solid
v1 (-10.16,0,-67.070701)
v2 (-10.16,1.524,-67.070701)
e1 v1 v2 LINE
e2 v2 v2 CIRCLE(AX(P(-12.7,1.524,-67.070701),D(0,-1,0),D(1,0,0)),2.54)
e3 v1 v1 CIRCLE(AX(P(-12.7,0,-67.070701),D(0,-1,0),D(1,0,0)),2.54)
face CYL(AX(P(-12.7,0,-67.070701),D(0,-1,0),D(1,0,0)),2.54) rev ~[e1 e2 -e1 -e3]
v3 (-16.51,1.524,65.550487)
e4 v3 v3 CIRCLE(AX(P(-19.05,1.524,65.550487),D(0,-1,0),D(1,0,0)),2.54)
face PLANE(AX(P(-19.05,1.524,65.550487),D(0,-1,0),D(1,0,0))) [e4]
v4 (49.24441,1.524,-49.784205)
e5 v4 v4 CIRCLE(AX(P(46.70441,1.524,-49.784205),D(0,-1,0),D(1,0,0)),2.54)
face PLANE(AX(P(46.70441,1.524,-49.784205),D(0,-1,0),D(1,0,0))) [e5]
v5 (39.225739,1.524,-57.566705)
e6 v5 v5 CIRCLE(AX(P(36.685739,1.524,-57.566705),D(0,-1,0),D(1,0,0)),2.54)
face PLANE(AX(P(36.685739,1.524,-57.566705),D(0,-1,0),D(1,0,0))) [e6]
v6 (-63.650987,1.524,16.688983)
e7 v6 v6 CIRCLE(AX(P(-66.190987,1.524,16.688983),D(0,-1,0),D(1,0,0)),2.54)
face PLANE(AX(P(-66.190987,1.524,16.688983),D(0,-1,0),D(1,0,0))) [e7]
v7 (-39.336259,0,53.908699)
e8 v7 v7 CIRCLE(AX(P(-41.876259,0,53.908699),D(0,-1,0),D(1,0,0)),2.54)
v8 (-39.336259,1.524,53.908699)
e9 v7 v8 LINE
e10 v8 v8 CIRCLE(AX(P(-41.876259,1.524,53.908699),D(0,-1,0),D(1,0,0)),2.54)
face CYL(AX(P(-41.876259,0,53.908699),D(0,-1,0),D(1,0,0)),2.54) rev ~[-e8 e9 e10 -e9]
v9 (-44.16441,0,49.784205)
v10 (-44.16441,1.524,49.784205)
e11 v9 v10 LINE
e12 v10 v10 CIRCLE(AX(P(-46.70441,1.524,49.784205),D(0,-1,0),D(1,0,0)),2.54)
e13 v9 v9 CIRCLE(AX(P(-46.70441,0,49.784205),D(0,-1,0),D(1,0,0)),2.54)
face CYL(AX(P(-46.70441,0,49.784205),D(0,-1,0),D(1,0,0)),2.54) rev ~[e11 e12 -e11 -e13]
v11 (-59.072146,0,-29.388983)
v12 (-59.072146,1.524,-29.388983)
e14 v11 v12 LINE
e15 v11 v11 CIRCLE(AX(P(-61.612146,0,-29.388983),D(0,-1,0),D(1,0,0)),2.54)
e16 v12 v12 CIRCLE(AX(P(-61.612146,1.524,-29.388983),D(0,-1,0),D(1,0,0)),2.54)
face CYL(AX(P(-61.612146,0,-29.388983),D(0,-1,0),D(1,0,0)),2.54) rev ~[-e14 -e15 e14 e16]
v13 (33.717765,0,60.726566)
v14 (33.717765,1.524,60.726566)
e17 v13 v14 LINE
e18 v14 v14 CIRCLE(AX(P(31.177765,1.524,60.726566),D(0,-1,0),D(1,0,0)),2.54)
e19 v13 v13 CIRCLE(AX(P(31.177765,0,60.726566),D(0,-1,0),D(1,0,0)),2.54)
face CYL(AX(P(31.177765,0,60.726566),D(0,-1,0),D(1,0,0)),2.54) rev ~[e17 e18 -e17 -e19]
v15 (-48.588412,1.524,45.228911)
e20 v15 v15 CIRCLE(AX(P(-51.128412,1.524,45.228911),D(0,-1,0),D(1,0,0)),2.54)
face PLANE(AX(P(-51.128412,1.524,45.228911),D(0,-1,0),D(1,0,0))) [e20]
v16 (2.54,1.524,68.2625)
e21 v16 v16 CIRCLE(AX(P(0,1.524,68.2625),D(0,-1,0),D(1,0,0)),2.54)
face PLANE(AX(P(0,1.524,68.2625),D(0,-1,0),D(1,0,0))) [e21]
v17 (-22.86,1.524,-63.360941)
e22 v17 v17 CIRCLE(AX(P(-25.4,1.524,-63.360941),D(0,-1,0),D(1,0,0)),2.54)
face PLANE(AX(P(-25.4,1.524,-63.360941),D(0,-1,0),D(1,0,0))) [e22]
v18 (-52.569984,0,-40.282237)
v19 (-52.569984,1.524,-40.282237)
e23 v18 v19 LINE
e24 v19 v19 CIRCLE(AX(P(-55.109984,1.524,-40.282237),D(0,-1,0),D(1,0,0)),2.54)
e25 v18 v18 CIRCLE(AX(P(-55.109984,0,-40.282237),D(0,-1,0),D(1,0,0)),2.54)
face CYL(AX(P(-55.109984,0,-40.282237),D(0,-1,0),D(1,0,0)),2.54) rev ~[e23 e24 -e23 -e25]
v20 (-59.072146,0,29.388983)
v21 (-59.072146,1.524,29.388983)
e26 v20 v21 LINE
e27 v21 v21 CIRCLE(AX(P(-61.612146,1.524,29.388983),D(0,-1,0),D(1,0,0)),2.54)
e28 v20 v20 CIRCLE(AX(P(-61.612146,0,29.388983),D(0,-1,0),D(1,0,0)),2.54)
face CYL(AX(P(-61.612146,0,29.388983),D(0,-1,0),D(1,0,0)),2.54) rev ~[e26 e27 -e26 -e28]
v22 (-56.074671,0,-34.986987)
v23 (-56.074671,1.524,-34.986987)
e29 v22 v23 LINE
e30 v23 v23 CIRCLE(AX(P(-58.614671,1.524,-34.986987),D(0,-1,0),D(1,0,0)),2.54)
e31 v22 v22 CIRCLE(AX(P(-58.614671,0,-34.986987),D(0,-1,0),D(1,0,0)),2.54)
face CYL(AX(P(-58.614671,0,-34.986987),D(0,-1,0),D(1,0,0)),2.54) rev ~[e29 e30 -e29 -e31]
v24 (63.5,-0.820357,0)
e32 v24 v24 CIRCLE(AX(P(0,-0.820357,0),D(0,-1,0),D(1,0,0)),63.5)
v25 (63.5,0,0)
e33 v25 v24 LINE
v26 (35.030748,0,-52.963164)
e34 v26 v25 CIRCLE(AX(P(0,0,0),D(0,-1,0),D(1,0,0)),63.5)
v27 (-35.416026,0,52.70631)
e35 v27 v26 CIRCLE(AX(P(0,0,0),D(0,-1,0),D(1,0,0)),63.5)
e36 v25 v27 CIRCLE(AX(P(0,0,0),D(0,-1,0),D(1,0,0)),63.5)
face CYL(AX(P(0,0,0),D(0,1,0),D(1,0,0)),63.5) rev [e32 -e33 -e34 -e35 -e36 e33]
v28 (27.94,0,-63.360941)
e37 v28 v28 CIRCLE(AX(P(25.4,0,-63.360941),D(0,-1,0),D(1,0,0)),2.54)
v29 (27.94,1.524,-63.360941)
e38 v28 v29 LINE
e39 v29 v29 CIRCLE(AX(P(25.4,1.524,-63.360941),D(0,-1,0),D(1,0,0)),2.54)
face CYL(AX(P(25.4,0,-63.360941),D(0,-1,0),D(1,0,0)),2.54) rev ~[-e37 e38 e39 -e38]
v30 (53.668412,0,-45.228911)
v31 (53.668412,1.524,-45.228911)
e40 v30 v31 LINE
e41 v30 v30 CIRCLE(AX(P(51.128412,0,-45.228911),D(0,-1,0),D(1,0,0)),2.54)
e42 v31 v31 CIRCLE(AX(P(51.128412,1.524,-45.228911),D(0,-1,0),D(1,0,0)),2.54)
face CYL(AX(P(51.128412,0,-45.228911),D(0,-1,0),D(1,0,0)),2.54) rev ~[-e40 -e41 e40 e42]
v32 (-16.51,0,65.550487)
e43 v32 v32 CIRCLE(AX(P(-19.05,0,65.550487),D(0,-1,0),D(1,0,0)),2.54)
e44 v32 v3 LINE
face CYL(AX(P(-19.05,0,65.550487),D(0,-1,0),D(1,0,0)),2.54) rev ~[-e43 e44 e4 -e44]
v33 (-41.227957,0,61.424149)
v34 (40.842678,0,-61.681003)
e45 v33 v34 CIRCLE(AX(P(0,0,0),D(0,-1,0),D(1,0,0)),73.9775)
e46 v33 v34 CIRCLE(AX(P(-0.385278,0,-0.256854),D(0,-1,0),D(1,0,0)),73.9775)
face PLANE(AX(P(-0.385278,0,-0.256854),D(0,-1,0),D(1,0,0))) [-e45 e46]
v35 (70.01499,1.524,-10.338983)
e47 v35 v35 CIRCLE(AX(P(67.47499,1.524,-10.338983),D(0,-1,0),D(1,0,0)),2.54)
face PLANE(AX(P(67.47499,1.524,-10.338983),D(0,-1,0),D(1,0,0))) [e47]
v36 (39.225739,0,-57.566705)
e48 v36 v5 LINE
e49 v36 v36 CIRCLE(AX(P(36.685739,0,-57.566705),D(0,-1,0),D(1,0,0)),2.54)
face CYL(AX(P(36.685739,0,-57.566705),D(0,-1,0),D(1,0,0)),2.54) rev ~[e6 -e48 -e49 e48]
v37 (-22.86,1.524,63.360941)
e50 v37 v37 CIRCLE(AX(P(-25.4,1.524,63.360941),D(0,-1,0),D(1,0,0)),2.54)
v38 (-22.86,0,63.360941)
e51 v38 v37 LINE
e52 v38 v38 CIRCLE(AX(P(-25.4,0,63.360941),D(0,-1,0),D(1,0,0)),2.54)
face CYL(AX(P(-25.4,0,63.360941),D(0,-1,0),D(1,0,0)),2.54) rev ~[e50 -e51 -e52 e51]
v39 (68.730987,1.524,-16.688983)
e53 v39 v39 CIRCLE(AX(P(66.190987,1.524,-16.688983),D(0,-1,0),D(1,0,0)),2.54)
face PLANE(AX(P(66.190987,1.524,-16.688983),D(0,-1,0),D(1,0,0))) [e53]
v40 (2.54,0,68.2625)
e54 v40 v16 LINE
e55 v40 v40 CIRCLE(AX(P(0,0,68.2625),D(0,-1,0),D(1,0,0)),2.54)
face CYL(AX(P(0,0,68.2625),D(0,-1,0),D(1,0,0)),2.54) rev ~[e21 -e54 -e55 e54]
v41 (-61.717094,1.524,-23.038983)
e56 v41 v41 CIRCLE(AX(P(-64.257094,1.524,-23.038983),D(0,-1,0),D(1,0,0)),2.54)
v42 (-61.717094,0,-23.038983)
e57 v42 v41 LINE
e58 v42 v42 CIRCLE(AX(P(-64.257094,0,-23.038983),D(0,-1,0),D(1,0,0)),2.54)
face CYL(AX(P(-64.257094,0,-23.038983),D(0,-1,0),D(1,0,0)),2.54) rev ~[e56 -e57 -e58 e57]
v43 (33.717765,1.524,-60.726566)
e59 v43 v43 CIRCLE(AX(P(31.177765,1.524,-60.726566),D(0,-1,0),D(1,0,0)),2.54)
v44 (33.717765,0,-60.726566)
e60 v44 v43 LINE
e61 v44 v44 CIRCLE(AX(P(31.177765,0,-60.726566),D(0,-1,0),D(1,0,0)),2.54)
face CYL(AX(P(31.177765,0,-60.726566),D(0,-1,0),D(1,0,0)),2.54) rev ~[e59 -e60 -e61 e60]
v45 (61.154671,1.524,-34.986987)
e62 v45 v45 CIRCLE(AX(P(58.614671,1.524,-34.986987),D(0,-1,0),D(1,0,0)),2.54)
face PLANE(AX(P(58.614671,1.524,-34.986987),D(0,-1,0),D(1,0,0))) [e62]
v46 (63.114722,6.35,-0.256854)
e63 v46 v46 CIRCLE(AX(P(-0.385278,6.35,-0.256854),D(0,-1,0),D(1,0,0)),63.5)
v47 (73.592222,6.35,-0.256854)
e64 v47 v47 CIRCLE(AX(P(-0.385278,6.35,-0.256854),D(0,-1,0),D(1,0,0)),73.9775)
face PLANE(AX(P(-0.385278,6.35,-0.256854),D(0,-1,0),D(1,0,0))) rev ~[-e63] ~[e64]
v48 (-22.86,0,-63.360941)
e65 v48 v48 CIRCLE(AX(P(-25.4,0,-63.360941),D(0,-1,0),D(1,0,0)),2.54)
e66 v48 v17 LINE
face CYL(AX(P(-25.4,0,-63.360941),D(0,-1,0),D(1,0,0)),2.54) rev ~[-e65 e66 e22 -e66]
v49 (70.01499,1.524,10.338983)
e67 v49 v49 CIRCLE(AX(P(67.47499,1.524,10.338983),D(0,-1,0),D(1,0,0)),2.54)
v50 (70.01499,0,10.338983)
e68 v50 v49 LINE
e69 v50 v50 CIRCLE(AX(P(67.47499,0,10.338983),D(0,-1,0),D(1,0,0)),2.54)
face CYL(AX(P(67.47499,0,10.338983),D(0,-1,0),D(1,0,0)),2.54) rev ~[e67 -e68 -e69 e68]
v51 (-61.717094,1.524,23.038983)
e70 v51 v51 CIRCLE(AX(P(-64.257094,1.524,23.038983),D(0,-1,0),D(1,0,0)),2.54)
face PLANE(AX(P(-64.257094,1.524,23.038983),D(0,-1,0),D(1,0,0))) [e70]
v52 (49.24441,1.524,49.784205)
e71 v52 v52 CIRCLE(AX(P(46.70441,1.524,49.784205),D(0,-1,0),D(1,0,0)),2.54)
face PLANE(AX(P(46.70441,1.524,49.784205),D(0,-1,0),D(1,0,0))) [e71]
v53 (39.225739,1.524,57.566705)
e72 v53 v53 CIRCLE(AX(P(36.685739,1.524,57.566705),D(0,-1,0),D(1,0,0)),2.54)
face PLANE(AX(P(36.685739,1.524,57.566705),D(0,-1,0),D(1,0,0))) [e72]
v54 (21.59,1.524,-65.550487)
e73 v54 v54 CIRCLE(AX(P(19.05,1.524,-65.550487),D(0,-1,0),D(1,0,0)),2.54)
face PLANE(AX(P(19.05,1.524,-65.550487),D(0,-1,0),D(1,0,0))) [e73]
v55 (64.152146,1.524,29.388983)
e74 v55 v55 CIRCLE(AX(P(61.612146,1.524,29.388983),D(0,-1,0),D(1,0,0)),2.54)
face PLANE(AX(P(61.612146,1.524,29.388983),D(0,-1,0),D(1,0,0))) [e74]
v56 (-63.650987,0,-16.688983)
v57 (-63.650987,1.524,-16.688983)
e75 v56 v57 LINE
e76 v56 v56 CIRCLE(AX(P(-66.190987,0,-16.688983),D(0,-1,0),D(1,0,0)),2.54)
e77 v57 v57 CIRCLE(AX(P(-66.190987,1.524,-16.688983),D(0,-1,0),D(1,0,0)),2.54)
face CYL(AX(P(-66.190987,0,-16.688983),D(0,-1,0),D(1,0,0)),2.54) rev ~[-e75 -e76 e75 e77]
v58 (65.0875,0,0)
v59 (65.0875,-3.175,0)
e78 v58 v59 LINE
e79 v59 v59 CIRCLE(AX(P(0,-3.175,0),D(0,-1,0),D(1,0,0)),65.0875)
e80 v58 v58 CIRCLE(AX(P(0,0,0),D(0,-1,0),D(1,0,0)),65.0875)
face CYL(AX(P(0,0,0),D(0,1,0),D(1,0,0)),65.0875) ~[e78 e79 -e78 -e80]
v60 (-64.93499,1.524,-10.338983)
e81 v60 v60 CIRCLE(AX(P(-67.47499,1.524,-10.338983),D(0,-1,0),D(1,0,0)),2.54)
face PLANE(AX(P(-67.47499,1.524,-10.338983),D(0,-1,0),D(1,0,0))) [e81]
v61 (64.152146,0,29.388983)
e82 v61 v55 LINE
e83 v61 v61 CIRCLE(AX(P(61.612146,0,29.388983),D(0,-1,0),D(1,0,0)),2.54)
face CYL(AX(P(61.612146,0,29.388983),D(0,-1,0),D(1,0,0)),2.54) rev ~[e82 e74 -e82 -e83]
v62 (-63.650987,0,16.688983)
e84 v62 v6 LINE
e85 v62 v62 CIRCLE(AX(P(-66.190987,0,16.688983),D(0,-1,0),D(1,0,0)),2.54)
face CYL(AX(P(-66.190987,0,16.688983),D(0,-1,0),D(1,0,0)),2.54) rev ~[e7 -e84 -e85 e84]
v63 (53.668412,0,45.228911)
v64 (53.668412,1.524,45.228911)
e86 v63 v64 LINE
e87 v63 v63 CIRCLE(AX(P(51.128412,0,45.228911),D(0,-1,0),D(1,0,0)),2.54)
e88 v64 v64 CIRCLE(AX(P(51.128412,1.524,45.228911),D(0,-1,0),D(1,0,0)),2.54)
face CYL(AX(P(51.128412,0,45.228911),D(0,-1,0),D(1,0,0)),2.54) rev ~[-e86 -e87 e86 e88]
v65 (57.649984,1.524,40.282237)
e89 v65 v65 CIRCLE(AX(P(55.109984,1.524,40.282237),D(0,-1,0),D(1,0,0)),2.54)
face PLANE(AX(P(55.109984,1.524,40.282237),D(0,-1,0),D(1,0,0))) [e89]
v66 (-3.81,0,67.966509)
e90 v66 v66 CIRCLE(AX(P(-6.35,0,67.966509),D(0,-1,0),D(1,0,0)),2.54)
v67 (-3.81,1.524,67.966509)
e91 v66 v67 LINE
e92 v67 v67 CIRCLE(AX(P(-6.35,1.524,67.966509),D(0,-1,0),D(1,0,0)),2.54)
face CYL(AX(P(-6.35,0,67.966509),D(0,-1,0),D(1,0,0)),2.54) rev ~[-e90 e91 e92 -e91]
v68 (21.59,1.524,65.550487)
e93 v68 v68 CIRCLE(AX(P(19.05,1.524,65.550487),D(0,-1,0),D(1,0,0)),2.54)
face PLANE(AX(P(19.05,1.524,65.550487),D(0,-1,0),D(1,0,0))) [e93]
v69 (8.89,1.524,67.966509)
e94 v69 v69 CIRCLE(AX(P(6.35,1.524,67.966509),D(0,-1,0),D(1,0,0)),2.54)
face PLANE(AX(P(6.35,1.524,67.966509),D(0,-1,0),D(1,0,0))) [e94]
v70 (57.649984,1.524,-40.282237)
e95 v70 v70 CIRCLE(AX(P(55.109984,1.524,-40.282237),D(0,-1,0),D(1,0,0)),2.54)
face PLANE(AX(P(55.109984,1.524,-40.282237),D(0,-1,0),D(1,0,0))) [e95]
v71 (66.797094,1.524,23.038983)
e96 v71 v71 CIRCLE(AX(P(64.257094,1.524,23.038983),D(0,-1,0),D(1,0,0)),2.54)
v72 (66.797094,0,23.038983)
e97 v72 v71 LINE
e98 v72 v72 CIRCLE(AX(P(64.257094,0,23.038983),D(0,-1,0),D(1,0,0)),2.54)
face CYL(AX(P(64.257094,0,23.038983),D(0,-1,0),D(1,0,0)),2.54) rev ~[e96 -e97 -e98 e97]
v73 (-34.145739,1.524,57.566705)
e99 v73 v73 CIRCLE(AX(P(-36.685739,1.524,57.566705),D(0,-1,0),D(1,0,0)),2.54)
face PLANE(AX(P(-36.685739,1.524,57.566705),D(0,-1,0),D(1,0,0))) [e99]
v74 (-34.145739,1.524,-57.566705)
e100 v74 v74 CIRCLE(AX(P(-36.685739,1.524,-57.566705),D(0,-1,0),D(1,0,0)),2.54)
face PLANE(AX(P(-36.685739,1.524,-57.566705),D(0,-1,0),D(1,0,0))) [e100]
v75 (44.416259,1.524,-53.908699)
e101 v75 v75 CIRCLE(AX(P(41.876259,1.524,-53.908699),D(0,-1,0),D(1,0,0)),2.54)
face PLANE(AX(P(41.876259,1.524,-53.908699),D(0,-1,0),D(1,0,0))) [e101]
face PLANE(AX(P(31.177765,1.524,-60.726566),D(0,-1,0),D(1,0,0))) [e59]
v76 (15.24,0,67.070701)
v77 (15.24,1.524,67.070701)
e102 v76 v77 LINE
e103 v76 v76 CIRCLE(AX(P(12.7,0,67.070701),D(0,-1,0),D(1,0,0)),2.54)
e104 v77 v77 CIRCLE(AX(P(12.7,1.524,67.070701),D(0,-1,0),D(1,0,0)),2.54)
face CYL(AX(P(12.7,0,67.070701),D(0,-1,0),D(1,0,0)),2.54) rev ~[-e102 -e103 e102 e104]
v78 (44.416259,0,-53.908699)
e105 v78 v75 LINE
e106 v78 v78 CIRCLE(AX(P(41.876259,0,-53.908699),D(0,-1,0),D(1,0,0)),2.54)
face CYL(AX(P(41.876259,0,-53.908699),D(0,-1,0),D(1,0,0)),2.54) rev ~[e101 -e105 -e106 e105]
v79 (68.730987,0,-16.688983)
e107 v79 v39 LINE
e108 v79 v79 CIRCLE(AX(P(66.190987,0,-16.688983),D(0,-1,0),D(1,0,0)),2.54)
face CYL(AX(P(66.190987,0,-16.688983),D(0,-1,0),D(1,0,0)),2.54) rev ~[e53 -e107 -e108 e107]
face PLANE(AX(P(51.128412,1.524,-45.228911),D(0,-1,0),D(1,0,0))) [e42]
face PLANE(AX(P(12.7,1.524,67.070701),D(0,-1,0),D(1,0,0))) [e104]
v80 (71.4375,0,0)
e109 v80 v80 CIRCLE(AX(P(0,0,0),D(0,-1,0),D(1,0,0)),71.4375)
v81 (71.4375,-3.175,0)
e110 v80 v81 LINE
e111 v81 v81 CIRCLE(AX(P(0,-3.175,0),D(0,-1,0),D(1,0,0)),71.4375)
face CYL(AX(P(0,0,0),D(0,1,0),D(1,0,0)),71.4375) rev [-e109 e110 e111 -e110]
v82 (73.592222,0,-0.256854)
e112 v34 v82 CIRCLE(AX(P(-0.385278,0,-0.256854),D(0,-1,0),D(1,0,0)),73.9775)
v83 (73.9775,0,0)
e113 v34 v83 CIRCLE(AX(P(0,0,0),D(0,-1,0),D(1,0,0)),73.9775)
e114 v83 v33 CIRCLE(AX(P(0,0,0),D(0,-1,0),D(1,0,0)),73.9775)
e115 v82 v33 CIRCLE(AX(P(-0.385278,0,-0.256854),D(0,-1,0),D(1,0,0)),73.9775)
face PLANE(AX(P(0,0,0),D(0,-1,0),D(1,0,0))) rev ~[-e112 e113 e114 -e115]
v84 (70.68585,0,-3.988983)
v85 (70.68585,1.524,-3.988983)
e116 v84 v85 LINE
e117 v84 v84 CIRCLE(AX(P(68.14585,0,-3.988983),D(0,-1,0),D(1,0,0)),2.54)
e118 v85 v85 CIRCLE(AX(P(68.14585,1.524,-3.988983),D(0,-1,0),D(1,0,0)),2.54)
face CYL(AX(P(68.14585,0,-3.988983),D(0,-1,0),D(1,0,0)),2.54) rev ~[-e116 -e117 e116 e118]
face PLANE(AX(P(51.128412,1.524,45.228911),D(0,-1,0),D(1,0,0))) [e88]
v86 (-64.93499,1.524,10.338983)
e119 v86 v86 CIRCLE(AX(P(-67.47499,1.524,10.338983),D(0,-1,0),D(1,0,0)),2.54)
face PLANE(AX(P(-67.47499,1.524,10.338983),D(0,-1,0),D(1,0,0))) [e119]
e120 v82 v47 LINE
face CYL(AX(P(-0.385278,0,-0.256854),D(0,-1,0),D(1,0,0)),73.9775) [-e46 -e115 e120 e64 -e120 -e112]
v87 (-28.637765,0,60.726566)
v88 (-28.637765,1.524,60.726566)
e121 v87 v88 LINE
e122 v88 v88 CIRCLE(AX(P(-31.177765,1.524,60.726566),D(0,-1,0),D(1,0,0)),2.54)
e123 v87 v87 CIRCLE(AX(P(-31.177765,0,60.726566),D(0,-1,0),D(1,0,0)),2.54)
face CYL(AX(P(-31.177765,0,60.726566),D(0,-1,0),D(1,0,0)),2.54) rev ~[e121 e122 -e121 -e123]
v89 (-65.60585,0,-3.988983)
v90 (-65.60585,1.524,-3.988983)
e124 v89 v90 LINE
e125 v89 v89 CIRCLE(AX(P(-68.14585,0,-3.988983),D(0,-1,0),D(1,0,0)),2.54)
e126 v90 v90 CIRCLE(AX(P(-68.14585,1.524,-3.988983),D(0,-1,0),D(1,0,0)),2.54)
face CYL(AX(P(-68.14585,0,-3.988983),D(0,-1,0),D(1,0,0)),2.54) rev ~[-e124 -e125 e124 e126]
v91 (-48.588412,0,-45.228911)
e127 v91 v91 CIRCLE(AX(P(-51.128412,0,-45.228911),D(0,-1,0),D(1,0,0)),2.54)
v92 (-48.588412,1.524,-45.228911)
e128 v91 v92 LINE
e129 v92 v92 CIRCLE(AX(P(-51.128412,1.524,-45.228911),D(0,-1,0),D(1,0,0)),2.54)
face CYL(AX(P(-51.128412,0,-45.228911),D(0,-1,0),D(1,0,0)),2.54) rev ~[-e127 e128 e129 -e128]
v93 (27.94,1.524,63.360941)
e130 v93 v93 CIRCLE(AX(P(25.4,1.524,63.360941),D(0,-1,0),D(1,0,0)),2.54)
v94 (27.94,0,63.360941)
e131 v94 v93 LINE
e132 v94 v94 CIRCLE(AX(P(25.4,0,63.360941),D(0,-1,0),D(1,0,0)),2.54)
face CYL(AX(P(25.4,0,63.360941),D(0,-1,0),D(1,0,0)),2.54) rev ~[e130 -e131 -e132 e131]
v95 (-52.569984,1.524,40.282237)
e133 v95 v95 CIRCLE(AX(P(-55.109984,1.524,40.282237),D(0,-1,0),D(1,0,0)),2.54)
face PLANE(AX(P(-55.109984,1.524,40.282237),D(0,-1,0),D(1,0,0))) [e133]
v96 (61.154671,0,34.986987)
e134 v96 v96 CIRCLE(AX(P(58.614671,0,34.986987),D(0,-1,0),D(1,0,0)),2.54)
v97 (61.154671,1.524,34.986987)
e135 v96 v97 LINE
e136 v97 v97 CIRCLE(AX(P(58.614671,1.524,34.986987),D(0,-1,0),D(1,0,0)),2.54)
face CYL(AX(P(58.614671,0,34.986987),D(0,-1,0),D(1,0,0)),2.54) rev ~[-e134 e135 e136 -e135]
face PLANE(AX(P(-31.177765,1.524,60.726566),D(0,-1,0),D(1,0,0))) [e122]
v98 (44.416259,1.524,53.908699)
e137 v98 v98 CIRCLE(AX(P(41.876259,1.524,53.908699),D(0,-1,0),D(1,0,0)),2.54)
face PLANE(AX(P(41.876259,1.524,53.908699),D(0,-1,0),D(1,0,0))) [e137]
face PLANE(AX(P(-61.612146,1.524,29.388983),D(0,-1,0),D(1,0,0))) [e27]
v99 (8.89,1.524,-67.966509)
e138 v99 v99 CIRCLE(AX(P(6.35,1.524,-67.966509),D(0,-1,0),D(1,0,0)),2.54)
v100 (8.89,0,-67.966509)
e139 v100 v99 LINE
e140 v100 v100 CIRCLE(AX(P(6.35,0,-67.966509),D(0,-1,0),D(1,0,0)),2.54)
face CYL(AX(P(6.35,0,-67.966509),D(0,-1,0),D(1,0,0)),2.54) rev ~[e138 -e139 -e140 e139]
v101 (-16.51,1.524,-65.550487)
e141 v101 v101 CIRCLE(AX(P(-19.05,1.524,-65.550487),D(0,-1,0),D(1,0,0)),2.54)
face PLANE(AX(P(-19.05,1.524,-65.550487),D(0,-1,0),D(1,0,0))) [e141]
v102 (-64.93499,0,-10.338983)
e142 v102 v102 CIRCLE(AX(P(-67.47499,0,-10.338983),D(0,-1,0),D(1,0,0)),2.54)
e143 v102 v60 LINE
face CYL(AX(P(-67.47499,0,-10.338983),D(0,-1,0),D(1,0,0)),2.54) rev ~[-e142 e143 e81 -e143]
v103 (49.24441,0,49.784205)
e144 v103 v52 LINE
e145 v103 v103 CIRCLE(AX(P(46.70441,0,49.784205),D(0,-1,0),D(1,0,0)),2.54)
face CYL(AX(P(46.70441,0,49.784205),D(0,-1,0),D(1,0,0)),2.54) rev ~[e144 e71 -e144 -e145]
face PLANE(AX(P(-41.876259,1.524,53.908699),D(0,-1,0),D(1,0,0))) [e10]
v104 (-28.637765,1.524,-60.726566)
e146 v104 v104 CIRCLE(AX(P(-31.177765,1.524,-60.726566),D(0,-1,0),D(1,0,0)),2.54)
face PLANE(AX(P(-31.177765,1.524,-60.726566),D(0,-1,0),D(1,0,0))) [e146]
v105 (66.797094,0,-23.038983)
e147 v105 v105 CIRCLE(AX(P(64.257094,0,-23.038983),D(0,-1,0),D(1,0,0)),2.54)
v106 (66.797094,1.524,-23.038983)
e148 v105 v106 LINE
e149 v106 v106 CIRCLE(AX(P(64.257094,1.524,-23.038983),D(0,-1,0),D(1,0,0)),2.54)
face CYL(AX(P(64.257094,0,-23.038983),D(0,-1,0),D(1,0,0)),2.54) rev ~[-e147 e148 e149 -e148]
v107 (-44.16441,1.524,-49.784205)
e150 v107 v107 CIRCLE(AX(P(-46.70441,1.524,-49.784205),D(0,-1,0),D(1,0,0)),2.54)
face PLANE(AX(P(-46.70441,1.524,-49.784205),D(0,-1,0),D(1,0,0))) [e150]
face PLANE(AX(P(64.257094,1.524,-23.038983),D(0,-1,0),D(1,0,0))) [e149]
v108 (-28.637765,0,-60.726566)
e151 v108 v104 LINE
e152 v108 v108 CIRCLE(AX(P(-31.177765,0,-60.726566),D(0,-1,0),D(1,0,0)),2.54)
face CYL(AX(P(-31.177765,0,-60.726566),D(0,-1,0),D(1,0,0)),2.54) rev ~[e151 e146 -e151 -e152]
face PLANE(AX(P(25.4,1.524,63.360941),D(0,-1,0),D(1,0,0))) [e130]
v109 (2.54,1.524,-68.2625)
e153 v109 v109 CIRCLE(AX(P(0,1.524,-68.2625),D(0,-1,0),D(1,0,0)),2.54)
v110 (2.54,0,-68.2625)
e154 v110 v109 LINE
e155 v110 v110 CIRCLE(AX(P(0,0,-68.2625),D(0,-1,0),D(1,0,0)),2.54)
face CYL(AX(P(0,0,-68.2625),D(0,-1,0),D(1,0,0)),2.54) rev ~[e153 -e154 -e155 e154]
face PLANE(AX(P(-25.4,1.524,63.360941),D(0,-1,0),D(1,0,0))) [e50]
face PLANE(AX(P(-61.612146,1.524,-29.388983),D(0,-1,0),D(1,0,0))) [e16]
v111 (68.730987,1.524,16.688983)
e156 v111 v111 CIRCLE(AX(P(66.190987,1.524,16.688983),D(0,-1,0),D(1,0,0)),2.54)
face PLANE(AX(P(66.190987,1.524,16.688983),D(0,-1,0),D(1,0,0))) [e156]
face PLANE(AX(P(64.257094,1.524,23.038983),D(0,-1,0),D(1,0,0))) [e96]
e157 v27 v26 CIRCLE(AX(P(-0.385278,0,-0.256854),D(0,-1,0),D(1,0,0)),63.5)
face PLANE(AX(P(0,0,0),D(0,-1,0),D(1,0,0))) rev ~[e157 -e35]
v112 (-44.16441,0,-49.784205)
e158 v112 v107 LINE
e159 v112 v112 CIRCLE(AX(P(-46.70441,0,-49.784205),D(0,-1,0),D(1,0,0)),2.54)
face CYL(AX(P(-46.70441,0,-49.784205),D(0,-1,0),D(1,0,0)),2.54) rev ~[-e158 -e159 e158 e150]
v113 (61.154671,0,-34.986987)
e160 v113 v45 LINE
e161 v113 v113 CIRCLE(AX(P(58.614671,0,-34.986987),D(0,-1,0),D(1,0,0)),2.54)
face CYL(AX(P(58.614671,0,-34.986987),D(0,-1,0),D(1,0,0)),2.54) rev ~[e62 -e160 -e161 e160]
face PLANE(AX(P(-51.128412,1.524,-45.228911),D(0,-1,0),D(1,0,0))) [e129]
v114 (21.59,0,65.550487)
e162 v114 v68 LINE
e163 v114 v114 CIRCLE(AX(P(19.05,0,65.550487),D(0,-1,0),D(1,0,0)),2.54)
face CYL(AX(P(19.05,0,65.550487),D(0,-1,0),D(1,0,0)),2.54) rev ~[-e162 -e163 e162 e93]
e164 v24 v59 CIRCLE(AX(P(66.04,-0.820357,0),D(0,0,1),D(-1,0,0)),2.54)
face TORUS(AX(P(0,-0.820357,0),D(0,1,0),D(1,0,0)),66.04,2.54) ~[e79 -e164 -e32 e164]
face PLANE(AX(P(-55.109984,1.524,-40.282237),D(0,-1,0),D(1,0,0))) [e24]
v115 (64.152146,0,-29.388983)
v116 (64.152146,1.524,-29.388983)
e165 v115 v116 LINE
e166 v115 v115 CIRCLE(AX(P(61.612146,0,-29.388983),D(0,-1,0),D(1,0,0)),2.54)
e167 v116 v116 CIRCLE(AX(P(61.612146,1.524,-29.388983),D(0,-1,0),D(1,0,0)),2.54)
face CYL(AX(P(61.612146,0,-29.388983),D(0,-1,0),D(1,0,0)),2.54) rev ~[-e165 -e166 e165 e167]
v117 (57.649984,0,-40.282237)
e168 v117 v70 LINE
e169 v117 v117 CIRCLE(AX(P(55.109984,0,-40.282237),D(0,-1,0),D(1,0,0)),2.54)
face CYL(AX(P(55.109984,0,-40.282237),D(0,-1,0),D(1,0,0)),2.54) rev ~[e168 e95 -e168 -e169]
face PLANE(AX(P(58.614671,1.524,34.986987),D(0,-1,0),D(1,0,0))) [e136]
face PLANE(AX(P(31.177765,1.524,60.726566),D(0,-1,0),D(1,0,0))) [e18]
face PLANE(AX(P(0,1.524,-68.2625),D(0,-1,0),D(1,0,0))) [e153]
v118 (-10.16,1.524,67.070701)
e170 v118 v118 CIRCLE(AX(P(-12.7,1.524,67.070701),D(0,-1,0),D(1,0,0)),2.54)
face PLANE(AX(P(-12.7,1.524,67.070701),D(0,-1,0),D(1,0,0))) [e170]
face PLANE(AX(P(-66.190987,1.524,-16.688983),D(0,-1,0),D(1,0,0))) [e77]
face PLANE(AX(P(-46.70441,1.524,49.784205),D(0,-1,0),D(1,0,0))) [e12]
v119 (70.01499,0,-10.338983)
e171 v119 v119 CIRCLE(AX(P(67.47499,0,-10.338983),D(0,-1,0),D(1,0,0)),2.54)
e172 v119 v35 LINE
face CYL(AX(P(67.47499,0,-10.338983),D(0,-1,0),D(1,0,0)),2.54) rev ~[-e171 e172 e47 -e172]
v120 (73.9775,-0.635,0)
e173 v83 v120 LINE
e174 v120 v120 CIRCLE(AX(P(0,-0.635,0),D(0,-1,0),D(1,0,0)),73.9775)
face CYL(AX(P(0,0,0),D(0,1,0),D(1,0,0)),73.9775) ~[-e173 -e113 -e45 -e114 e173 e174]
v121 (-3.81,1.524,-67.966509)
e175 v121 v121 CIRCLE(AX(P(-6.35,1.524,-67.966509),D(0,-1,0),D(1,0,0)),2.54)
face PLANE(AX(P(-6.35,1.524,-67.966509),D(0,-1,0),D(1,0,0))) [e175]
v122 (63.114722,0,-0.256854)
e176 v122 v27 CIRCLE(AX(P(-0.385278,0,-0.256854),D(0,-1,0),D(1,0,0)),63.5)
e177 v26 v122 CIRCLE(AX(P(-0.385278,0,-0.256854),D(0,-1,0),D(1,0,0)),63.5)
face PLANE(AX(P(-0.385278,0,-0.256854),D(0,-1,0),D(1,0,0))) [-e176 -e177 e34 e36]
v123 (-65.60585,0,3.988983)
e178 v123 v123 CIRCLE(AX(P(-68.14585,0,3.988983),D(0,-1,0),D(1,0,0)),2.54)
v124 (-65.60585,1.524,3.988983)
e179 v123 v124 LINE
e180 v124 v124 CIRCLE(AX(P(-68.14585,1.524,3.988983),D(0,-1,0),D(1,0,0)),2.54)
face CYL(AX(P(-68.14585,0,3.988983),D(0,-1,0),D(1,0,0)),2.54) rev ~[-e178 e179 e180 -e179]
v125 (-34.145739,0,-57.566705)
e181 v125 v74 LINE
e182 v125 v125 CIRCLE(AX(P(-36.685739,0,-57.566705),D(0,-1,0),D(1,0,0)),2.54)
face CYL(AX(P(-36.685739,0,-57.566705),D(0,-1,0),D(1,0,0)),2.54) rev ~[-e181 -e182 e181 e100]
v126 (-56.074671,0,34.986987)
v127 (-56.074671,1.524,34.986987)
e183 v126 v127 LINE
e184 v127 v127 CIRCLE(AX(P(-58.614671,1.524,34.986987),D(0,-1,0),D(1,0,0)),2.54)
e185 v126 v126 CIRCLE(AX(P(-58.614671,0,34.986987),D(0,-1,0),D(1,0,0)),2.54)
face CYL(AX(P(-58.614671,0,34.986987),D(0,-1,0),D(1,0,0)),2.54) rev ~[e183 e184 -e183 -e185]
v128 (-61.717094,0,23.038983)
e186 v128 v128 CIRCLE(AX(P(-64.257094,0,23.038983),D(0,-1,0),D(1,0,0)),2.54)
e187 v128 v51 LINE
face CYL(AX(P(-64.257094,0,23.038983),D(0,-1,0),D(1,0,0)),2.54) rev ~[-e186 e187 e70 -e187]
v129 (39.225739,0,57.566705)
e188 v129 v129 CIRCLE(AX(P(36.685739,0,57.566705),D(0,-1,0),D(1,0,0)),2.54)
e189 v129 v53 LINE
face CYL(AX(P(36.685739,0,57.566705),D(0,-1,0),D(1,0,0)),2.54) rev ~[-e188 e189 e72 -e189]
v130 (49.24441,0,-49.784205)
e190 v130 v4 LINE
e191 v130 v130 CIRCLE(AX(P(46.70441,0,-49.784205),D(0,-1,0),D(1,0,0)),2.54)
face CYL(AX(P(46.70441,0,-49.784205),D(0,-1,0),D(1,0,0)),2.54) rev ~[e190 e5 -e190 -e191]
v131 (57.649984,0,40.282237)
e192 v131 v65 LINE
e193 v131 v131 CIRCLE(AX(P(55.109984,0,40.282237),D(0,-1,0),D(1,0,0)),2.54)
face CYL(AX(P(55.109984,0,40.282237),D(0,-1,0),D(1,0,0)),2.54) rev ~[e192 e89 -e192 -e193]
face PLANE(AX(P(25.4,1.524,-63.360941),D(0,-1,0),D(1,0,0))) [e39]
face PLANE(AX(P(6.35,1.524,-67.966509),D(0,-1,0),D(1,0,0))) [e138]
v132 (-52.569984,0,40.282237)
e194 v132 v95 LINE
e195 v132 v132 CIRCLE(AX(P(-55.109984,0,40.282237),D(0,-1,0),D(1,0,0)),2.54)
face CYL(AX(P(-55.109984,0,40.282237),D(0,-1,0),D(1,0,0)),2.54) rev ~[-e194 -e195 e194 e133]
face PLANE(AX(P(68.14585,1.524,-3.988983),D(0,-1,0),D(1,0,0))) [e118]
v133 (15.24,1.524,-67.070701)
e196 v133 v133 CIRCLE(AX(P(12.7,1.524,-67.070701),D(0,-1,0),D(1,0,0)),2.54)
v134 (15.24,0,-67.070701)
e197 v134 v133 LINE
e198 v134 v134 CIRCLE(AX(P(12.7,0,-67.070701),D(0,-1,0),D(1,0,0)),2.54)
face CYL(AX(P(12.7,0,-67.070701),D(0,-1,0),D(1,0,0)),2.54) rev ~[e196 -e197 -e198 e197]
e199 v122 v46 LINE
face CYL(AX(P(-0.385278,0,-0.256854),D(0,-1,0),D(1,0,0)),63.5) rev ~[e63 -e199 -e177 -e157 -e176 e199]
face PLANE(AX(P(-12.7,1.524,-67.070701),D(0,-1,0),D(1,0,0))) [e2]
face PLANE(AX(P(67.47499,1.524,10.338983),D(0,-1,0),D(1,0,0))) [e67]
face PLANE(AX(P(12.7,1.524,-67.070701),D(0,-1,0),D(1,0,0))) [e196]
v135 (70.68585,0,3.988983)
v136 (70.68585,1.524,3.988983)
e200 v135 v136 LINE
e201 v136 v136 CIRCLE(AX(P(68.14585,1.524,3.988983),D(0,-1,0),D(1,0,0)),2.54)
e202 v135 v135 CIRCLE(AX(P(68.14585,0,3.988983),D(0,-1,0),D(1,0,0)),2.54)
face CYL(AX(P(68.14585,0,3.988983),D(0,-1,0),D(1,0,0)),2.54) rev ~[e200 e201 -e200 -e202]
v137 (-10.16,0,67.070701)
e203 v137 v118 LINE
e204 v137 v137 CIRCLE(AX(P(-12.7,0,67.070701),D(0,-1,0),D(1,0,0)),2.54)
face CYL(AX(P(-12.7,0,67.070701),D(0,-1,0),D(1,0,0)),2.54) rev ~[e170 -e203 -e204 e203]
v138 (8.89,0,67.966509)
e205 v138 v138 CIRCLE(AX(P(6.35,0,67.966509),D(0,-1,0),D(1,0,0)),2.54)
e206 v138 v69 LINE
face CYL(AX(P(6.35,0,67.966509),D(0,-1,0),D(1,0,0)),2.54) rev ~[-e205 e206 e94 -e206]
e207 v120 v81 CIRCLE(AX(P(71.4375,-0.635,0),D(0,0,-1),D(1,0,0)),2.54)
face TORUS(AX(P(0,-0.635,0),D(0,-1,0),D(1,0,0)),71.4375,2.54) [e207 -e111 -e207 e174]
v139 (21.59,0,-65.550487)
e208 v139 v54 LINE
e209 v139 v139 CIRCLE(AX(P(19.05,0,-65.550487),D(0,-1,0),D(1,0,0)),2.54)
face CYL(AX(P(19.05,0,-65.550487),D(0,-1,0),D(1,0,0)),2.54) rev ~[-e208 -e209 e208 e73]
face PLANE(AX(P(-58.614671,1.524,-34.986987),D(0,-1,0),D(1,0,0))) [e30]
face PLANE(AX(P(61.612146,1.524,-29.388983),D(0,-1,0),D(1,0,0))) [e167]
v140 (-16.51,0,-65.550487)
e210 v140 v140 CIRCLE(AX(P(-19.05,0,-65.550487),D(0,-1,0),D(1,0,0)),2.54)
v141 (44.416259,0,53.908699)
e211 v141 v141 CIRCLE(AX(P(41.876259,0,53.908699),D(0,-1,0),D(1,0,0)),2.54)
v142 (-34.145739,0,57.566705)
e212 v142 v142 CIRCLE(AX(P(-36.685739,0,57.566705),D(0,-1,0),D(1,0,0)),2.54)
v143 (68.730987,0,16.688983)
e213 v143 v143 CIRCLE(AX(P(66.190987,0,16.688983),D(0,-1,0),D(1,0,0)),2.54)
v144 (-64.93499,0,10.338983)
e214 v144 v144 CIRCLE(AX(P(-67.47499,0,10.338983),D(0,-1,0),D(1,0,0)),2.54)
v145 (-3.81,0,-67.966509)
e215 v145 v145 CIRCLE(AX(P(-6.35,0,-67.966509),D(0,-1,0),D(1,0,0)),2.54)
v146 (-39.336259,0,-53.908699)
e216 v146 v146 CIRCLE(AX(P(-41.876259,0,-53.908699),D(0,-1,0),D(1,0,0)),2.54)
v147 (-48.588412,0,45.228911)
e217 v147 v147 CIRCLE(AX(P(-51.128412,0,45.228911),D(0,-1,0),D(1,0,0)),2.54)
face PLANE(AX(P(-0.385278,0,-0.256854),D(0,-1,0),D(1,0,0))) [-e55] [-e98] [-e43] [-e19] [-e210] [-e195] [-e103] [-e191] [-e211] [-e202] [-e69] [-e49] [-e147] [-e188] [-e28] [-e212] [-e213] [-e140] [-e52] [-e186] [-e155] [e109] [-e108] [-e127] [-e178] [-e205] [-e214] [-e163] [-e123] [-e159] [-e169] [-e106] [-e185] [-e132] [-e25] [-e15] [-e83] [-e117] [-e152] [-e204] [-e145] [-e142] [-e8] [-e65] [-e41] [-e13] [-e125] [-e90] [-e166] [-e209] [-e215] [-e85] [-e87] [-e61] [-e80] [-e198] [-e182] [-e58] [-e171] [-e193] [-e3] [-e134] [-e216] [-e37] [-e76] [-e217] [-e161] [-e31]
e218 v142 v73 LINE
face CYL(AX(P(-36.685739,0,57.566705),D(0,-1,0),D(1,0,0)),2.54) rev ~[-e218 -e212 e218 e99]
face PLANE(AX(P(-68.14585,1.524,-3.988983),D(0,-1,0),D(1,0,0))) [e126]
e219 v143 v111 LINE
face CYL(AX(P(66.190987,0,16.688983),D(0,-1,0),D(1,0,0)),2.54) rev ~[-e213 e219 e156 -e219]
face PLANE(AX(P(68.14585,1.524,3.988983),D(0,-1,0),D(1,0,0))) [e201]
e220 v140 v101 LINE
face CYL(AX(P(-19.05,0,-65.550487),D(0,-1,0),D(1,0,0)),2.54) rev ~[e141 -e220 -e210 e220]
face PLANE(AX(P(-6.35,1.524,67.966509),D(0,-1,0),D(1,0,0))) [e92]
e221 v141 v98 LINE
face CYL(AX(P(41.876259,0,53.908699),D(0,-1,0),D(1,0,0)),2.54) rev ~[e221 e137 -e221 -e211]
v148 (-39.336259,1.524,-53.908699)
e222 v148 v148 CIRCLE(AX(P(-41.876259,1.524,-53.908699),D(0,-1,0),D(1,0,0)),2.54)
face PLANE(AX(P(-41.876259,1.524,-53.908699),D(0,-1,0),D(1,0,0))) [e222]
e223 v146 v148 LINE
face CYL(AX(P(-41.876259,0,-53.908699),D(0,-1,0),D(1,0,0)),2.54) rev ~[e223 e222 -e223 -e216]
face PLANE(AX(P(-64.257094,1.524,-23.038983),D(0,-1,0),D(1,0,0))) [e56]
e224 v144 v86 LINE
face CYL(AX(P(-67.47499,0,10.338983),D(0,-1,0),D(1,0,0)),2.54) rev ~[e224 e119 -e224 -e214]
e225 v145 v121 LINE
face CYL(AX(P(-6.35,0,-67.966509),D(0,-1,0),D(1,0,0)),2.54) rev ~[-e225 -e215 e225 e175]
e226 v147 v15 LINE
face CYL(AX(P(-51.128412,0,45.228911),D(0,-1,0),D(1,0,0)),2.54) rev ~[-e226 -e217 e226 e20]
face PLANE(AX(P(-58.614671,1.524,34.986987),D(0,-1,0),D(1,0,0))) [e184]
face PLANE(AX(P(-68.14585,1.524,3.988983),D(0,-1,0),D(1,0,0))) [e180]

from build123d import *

# Parameters (mm, degrees)
F1_R     = 73.9775
F1_R_2   = 63.5
F2_DEPTH = 6.35
F0_R     = 73.9775
F0_R_2   = 71.4375
F0_R_3   = 65.0875
F0_R_4   = 63.5
F3_DEPTH = 3.175
F0_R_5   = 2.54
F4_DEPTH = 1.524


# Not quite as in the source:
# - a fillet or chamfer that OpenCascade refuses, or shapes differently, is made with other operations: its cross-section is extruded or revolved along the edge and cut away or added


with BuildPart() as f2:
    # F1 (on Front) → F2 (new body)
    with BuildSketch(Plane.XZ):
        with Locations((-0.3852783993, -0.2568539348)):
            Circle(F1_R)
        with Locations((-0.3852783993, -0.2568539348)):
            Circle(F1_R_2, mode=Mode.SUBTRACT)
    extrude(amount=-F2_DEPTH)

    # F0 (on Front) → F3 (join)
    with BuildSketch(Plane.XZ):
        Circle(F0_R)
        Circle(F0_R_2, mode=Mode.SUBTRACT)
        Circle(F0_R_3)
        Circle(F0_R_4, mode=Mode.SUBTRACT)
    extrude(amount=F3_DEPTH)

    # F0 (on Front) → F4 (cut)
    with BuildSketch(Plane.XZ):
        with Locations((-67.4749903807, 10.3389834788)):
            Circle(F0_R_5)
        with Locations((-66.1909868237, 16.6889834788)):
            Circle(F0_R_5)
        with Locations((-64.2570941337, 23.0389834788)):
            Circle(F0_R_5)
        with Locations((-61.6121461753, 29.3889834788)):
            Circle(F0_R_5)
        with Locations((-58.6146709728, 34.9869869095)):
            Circle(F0_R_5)
        with Locations((-55.1099839067, 40.2822365324)):
            Circle(F0_R_5)
        with Locations((-51.1284121773, 45.2289108257)):
            Circle(F0_R_5)
        with Locations((-46.7044096232, 49.7842046034)):
            Circle(F0_R_5)
        with Locations((-41.8762585813, 53.908699423)):
            Circle(F0_R_5)
        with Locations((-36.6857386172, 57.5667046856)):
            Circle(F0_R_5)
        with Locations((-31.1777649927, 60.7265664788)):
            Circle(F0_R_5)
        with Locations((-25.4, 63.360941488)):
            Circle(F0_R_5)
        with Locations((-19.05, 65.55048746)):
            Circle(F0_R_5)
        with Locations((-12.7, 67.0707008033)):
            Circle(F0_R_5)
        with Locations((-6.35, 67.9665094458)):
            Circle(F0_R_5)
        with Locations((0, 68.2625)):
            Circle(F0_R_5)
        with Locations((6.35, 67.9665094458)):
            Circle(F0_R_5)
        with Locations((12.7, 67.0707008033)):
            Circle(F0_R_5)
        with Locations((19.05, 65.55048746)):
            Circle(F0_R_5)
        with Locations((25.4, 63.360941488)):
            Circle(F0_R_5)
        with Locations((31.1777649927, 60.7265664788)):
            Circle(F0_R_5)
        with Locations((36.6857386172, 57.5667046856)):
            Circle(F0_R_5)
        with Locations((41.8762585813, 53.908699423)):
            Circle(F0_R_5)
        with Locations((46.7044096232, 49.7842046034)):
            Circle(F0_R_5)
        with Locations((51.1284121773, 45.2289108257)):
            Circle(F0_R_5)
        with Locations((55.1099839067, 40.2822365324)):
            Circle(F0_R_5)
        with Locations((58.6146709728, 34.9869869095)):
            Circle(F0_R_5)
        with Locations((61.6121461753, 29.3889834788)):
            Circle(F0_R_5)
        with Locations((64.2570941337, 23.0389834788)):
            Circle(F0_R_5)
        with Locations((66.1909868237, 16.6889834788)):
            Circle(F0_R_5)
        with Locations((67.4749903807, 10.3389834788)):
            Circle(F0_R_5)
        with Locations((68.145850329, 3.9889834788)):
            Circle(F0_R_5)
        with Locations((68.145850329, -3.9889834788)):
            Circle(F0_R_5)
        with Locations((67.4749903807, -10.3389834788)):
            Circle(F0_R_5)
        with Locations((66.1909868237, -16.6889834788)):
            Circle(F0_R_5)
        with Locations((64.2570941337, -23.0389834788)):
            Circle(F0_R_5)
        with Locations((61.6121461753, -29.3889834788)):
            Circle(F0_R_5)
        with Locations((58.6146709728, -34.9869869095)):
            Circle(F0_R_5)
        with Locations((55.1099839067, -40.2822365324)):
            Circle(F0_R_5)
        with Locations((51.1284121773, -45.2289108257)):
            Circle(F0_R_5)
        with Locations((46.7044096232, -49.7842046034)):
            Circle(F0_R_5)
        with Locations((41.8762585813, -53.908699423)):
            Circle(F0_R_5)
        with Locations((36.6857386172, -57.5667046856)):
            Circle(F0_R_5)
        with Locations((31.1777649927, -60.7265664788)):
            Circle(F0_R_5)
        with Locations((25.4, -63.360941488)):
            Circle(F0_R_5)
        with Locations((19.05, -65.55048746)):
            Circle(F0_R_5)
        with Locations((12.7, -67.0707008033)):
            Circle(F0_R_5)
        with Locations((6.35, -67.9665094458)):
            Circle(F0_R_5)
        with Locations((0, -68.2625)):
            Circle(F0_R_5)
        with Locations((-6.35, -67.9665094458)):
            Circle(F0_R_5)
        with Locations((-12.7, -67.0707008033)):
            Circle(F0_R_5)
        with Locations((-19.05, -65.55048746)):
            Circle(F0_R_5)
        with Locations((-25.4, -63.360941488)):
            Circle(F0_R_5)
        with Locations((-31.1777649927, -60.7265664788)):
            Circle(F0_R_5)
        with Locations((-36.6857386172, -57.5667046856)):
            Circle(F0_R_5)
        with Locations((-41.8762585813, -53.908699423)):
            Circle(F0_R_5)
        with Locations((-46.7044096232, -49.7842046034)):
            Circle(F0_R_5)
        with Locations((-51.1284121773, -45.2289108257)):
            Circle(F0_R_5)
        with Locations((-55.1099839067, -40.2822365324)):
            Circle(F0_R_5)
        with Locations((-58.6146709728, -34.9869869095)):
            Circle(F0_R_5)
        with Locations((-61.6121461753, -29.3889834788)):
            Circle(F0_R_5)
        with Locations((-64.2570941337, -23.0389834788)):
            Circle(F0_R_5)
        with Locations((-66.1909868237, -16.6889834788)):
            Circle(F0_R_5)
        with Locations((-67.4749903807, -10.3389834788)):
            Circle(F0_R_5)
        with Locations((-68.145850329, -3.9889834788)):
            Circle(F0_R_5)
        with Locations((-68.145850329, 3.9889834788)):
            Circle(F0_R_5)
    extrude(amount=-F4_DEPTH, mode=Mode.SUBTRACT)

    # F5: fillet of radius 2.54 on 2 edges, made by hand

    # F5_s1 → F5_t2 (revolve, cut)
    with BuildSketch(Plane.XY):
        with BuildLine():
            ThreePointArc((73.9775, -0.635), (73.2335512242, -2.4310512242), (71.4375, -3.175))
            Line((71.4375, -3.175), (73.9775, -3.175))
            Line((73.9775, -3.175), (73.9775, -0.635))
        make_face()
    revolve(axis=Axis((0, -3.175, 0), (0, -1, 0)), mode=Mode.SUBTRACT)

    # F5_s3 → F5_t4 (revolve, cut)
    with BuildSketch(Plane.XY):
        with BuildLine():
            ThreePointArc((63.5, -0.8203569803), (63.9339432581, -2.2402601461), (65.0875, -3.175))
            Line((65.0875, -3.175), (63.5, -3.175))
            Line((63.5, -3.175), (63.5, -0.8203569803))
        make_face()
    revolve(axis=Axis((0, -3.175, 0), (0, -1, 0)), mode=Mode.SUBTRACT)


solid = f2.part
